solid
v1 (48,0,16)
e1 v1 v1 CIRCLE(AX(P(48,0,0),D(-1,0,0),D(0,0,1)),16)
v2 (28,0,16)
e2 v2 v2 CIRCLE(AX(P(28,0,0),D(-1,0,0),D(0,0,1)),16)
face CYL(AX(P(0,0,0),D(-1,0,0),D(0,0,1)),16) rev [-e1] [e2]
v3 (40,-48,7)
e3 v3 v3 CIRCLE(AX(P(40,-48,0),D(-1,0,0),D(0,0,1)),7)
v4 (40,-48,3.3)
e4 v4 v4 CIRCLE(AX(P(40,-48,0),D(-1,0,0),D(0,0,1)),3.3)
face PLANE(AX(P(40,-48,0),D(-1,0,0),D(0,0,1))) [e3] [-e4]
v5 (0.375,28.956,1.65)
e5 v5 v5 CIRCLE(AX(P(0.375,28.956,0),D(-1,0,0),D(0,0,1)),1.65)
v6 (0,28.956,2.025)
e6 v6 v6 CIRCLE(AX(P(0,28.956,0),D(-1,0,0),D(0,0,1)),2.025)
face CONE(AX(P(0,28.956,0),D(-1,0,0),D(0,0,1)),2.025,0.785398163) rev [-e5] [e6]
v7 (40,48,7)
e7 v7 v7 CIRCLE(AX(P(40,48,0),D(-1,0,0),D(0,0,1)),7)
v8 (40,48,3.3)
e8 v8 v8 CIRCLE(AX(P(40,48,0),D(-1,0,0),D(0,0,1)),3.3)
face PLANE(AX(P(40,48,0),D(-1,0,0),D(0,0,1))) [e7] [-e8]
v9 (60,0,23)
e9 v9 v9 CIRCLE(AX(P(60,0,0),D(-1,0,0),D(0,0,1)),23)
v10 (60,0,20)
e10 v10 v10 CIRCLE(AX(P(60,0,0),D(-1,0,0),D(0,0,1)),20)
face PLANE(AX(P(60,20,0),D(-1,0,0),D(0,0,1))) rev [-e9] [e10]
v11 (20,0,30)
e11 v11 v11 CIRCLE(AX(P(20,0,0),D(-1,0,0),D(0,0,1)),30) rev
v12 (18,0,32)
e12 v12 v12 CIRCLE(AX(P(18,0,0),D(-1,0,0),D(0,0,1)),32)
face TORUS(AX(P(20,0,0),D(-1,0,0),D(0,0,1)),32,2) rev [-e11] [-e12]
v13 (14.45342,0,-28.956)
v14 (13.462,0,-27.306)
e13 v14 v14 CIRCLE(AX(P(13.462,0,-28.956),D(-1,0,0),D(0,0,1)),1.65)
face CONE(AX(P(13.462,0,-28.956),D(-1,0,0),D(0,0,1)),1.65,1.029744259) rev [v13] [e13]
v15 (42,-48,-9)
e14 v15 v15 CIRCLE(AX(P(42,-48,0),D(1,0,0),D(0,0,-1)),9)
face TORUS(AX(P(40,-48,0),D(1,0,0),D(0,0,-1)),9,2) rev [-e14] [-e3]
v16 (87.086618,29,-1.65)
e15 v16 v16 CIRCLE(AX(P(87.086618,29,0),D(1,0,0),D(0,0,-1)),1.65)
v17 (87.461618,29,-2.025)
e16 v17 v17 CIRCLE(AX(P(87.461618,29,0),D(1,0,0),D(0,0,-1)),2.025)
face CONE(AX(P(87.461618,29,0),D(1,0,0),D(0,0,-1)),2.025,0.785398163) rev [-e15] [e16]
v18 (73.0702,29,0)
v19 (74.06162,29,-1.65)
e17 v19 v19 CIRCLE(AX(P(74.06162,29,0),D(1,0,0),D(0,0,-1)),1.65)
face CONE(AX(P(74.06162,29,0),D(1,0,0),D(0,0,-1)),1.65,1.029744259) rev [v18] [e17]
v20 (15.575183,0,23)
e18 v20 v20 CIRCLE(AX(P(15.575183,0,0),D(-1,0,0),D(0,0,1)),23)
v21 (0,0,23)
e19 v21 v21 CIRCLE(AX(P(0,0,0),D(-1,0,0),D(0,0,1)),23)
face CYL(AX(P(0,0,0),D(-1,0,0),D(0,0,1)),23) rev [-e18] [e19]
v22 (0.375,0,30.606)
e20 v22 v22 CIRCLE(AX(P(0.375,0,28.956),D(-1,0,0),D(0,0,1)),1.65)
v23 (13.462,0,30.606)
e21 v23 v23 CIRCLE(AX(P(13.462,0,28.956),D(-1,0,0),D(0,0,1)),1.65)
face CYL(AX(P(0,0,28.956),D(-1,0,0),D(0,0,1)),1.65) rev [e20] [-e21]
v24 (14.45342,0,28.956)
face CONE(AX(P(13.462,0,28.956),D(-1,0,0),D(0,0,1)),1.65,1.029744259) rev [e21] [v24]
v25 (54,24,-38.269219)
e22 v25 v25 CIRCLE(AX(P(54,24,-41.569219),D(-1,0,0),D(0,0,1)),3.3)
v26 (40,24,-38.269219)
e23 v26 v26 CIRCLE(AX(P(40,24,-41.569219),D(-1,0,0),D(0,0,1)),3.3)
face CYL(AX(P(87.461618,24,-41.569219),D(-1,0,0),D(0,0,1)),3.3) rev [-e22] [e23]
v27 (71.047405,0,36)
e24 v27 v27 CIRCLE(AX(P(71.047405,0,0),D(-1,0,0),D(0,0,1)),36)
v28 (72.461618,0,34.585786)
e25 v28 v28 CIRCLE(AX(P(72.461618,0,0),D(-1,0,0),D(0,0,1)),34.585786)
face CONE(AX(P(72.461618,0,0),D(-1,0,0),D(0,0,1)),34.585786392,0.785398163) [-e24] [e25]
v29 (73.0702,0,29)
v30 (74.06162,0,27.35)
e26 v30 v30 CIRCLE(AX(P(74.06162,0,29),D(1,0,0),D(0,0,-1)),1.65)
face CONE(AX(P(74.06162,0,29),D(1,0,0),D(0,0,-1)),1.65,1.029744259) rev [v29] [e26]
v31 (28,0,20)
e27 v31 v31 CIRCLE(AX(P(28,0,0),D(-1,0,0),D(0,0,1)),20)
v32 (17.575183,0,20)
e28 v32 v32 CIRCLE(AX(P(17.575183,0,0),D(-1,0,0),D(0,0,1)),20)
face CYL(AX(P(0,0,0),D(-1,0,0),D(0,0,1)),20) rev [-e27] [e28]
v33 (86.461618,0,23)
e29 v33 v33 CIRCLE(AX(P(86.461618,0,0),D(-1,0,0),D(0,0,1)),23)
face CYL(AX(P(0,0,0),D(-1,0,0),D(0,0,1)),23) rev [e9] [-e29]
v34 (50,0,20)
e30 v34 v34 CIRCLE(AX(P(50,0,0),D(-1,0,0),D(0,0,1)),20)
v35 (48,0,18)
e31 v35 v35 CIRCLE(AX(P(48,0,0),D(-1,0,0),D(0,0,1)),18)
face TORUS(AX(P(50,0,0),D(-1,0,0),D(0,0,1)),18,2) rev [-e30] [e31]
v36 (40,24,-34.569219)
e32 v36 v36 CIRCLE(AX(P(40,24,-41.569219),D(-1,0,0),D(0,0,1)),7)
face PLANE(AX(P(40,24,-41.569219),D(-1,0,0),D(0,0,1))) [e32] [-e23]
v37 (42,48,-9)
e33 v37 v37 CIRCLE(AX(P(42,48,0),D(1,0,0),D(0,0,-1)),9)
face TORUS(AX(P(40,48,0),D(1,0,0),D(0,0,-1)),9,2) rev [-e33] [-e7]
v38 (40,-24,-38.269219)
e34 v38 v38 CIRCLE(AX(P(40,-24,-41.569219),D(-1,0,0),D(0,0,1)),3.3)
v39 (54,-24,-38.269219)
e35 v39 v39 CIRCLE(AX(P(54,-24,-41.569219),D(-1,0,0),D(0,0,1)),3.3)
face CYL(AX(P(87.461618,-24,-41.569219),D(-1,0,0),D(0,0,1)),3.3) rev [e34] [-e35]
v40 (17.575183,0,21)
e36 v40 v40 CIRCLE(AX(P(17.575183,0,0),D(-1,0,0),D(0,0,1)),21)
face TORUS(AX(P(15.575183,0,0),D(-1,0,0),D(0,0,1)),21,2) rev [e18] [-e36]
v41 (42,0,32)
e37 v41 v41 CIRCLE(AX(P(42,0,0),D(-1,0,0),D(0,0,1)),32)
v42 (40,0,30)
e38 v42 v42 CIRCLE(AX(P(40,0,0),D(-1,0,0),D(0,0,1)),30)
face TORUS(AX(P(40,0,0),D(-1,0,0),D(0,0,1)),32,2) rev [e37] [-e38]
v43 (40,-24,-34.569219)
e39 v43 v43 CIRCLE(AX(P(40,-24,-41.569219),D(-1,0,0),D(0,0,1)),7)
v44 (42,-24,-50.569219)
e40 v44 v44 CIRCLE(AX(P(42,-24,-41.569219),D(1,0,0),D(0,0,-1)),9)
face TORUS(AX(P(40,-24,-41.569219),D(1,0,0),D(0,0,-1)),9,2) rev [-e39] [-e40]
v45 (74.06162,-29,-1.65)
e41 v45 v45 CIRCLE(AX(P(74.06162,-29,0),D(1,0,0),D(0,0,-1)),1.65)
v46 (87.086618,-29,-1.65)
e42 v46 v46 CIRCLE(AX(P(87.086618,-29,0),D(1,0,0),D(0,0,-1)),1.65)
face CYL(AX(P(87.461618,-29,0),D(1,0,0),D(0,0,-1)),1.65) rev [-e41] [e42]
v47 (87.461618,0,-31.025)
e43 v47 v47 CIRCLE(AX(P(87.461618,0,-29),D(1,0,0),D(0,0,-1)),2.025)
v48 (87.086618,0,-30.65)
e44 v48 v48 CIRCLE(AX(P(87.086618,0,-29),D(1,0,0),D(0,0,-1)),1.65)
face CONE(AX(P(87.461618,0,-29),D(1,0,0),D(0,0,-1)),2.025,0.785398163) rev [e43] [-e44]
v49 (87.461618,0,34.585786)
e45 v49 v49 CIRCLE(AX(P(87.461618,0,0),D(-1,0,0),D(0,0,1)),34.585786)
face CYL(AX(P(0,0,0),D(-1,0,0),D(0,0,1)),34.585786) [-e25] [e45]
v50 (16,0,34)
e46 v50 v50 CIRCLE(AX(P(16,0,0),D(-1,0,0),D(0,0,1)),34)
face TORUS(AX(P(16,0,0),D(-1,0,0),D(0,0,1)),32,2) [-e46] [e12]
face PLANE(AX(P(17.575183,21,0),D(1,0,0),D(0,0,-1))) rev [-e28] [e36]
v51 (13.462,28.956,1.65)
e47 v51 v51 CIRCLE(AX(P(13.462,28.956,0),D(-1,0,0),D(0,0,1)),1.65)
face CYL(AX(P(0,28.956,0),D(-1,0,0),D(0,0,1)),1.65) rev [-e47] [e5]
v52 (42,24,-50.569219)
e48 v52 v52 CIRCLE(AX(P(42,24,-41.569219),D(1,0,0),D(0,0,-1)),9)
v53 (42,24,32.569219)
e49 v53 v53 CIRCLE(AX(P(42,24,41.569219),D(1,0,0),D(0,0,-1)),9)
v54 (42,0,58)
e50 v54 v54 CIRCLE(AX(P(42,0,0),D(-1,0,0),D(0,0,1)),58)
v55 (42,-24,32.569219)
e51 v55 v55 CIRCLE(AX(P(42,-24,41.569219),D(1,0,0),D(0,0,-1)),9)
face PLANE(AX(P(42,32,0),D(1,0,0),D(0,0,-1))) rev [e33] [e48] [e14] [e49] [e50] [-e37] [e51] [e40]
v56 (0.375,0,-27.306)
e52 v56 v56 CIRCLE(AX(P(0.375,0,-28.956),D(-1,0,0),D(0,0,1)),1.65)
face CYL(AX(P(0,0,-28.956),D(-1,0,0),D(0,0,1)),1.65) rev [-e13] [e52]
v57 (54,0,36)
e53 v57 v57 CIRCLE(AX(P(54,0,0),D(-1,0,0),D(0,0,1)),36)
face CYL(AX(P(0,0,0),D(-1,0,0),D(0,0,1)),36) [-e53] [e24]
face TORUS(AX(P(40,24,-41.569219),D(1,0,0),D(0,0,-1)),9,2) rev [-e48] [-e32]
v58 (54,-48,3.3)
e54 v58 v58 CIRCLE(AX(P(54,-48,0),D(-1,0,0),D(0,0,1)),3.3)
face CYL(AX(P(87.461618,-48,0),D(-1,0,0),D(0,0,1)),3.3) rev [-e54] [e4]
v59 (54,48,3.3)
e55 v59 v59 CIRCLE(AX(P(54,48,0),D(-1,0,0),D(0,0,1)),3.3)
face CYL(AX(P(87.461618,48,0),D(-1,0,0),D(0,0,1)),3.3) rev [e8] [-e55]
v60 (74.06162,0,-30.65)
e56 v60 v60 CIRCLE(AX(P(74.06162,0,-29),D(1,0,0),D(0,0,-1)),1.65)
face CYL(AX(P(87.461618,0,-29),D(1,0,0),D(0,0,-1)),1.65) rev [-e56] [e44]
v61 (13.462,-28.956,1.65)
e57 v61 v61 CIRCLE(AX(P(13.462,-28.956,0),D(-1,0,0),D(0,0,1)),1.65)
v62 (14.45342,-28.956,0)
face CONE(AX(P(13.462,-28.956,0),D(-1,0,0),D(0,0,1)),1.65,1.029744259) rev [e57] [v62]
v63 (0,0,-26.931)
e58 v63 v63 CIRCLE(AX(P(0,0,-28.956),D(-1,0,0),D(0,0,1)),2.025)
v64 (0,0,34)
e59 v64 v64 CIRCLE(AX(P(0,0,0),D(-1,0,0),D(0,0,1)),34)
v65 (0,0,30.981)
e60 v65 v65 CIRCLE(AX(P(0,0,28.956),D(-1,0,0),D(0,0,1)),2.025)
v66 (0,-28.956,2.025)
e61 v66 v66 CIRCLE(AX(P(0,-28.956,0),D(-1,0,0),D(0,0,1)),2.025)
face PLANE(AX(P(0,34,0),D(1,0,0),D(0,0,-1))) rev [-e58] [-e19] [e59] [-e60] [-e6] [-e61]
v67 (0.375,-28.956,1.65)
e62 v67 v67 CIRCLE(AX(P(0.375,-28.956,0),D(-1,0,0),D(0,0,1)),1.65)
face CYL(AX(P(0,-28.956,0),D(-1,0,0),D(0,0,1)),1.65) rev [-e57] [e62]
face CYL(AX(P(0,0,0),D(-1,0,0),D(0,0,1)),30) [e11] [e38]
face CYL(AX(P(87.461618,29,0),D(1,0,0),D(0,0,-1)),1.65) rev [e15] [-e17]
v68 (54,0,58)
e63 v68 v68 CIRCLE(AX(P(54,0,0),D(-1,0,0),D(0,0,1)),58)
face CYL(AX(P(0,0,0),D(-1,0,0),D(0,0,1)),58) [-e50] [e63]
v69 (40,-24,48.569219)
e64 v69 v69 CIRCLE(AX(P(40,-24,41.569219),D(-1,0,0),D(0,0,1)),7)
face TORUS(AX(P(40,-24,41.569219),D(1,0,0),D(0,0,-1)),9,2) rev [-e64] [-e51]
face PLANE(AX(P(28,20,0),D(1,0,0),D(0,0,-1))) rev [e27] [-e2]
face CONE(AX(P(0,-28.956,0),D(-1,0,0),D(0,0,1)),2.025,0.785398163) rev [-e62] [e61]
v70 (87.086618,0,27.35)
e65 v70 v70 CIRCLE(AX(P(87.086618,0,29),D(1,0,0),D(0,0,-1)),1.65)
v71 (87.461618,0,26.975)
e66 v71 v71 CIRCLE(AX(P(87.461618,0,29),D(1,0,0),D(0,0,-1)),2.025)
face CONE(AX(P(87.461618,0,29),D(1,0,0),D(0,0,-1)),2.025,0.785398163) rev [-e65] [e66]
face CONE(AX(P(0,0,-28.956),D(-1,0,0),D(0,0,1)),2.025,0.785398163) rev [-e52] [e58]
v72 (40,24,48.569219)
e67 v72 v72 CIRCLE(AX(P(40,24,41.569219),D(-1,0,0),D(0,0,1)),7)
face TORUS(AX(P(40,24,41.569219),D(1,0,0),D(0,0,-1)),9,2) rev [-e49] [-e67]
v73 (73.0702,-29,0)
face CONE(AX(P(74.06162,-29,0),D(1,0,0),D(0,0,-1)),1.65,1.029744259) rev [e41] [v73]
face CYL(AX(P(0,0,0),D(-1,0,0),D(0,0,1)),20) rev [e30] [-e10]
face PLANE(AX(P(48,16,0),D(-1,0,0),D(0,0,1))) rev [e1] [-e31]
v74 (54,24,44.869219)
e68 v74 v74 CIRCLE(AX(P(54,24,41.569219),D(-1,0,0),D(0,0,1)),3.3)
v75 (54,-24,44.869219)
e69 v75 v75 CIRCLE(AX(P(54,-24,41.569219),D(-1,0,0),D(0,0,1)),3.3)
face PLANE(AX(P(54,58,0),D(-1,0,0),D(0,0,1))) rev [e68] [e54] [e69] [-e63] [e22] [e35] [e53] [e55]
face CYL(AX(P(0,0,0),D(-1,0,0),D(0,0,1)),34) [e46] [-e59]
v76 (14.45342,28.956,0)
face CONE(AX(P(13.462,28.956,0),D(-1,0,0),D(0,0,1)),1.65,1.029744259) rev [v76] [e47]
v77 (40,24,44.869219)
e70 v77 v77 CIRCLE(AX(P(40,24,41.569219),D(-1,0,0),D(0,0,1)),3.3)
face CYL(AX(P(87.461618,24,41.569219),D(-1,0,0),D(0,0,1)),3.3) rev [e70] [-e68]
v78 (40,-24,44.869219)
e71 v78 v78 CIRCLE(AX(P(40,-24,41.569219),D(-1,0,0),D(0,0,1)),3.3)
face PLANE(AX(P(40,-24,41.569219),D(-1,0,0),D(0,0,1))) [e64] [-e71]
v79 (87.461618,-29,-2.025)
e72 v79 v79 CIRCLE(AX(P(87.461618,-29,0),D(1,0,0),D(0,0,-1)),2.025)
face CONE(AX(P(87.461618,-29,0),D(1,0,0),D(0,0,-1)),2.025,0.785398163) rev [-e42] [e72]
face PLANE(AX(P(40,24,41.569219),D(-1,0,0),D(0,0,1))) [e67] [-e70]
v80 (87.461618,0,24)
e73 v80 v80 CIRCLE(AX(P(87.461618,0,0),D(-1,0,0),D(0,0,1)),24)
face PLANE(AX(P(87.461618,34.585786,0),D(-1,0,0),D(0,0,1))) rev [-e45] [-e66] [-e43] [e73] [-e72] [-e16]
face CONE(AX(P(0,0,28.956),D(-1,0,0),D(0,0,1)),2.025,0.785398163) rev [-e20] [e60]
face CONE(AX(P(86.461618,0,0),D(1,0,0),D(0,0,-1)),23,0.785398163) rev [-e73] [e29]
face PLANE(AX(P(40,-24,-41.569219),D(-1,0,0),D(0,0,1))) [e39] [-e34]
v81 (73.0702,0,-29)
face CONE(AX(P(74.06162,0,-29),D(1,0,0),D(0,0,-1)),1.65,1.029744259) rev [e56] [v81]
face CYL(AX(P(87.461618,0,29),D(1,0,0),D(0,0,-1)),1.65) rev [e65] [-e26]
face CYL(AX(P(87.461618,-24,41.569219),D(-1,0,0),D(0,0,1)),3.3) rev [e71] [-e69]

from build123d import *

# Parameters (mm, degrees)
SKETCH2_R                       = 7
BOSS_EXTRUDE1_DEPTH             = 2
FILLET1_R                       = 2.000000064
SKETCH3_R                       = 3.3
CUT_EXTRUDE1_DEPTH              = 95.766055219
M4X0_7_TAPPED_HOLE1_D           = 3.3
M4X0_7_TAPPED_HOLE1_DEPTH       = 13.3999986
M4X0_7_TAPPED_HOLE1_CSINK_D     = 4.05
M4X0_7_TAPPED_HOLE1_CSINK_ANGLE = 90
M4X0_7_TAPPED_HOLE1_TIP         = 0.991420021
M4X0_7_TAPPED_HOLE2_D           = 3.3
M4X0_7_TAPPED_HOLE2_DEPTH       = 13.462
M4X0_7_TAPPED_HOLE2_CSINK_D     = 4.05
M4X0_7_TAPPED_HOLE2_CSINK_ANGLE = 90
M4X0_7_TAPPED_HOLE2_TIP         = 0.991420021
FILLET2_R                       = 2.000000064


with BuildPart() as part:
    # Sketch1 → Revolve1 (revolve)
    with BuildSketch(Plane.XY, mode=Mode.PRIVATE) as revolve1_sk:
        with BuildLine():
            Line((0, 34), (0, 23))
            Line((0, 23), (15.575182577, 23))
            ThreePointArc((15.575182577, 23), (16.989396139, 22.414213562), (17.575182577, 21))
            Line((17.575182577, 21), (17.575182577, 20))
            Line((17.575182577, 20), (28, 20))
            Line((28, 20), (28, 16))
            Line((28, 16), (48, 16))
            Line((48, 16), (48, 18))
            ThreePointArc((48, 18), (48.585786438, 19.414213562), (50, 20))
            Line((50, 20), (60, 20))
            Line((60, 20), (60, 23))
            Line((60, 23), (86.461618407, 23))
            Line((86.461618407, 23), (87.461618407, 24))
            Line((87.461618407, 24), (87.461618407, 34.585786392))
            Line((87.461618407, 34.585786392), (72.461618407, 34.585786392))
            Line((72.461618407, 34.585786392), (71.047404799, 36))
            Line((71.047404799, 36), (54, 36))
            Line((54, 36), (54, 58))
            Line((54, 58), (42, 58))
            Line((42, 58), (42, 32))
            ThreePointArc((42, 32), (41.414213562, 30.585786438), (40, 30))
            Line((40, 30), (18, 30))
            Line((18, 30), (18, 34))
            Line((18, 34), (0, 34))
        make_face()
    revolve(revolve1_sk.sketch.rotate(Axis((0, 0, 0), (1, 0, 0)), 90), axis=Axis((0, 0, 0), (1, 0, 0)))

    # Sketch2 → Boss-Extrude1 (add)
    with BuildSketch(Plane.ZY.offset(-42)):
        with Locations(Location((0, 48, 0), (0, 0, 180))):
            Circle(SKETCH2_R)
        with Locations(Location((41.569219382, 24, 0), (0, 0, 180))):
            Circle(SKETCH2_R)
        with Locations(Location((41.569219382, -24, 0), (0, 0, 180))):
            Circle(SKETCH2_R)
        with Locations(Location((0, -48, 0), (0, 0, 180))):
            Circle(SKETCH2_R)
        with Locations(Location((-41.569219382, -24, 0), (0, 0, 180))):
            Circle(SKETCH2_R)
        with Locations(Location((-41.569219382, 24, 0), (0, 0, 180))):
            Circle(SKETCH2_R)
    extrude(amount=BOSS_EXTRUDE1_DEPTH)

    # Fillet1
    fillet1_edges = [part.edges().sort_by_distance(p)[0] for p in [
        (42, 48, 7),
        (42, 24, 48.569219382),
        (42, -24, 48.569219382),
        (42, -48, 7),
        (42, -24, -34.569219382),
        (42, 24, -34.569219382),
    ]]
    fillet(fillet1_edges, radius=FILLET1_R - 0.0001)  # a hair under: the kernel refuses the full size

    # Sketch3 → Cut-Extrude1 (cut, through all)
    with BuildSketch(Plane.ZY.offset(-40)):
        with Locations((0, 48)):
            Circle(SKETCH3_R)
        with Locations((41.569219382, 24)):
            Circle(SKETCH3_R)
        with Locations((41.569219382, -24)):
            Circle(SKETCH3_R)
        with Locations((0, -48)):
            Circle(SKETCH3_R)
        with Locations((-41.569219382, -24)):
            Circle(SKETCH3_R)
        with Locations((-41.569219382, 24)):
            Circle(SKETCH3_R)
    extrude(amount=-CUT_EXTRUDE1_DEPTH, mode=Mode.SUBTRACT)

    # M4x0.7 Tapped Hole1
    with Locations(Plane(origin=(87.461618407, 29, 0), x_dir=(0, 0, 1), z_dir=(1, 0, 0))):
        with Locations((0, 0), (-29, 29), (0, 58), (29, 29)):
            CounterSinkHole(M4X0_7_TAPPED_HOLE1_D / 2, M4X0_7_TAPPED_HOLE1_CSINK_D / 2, depth=M4X0_7_TAPPED_HOLE1_DEPTH, counter_sink_angle=M4X0_7_TAPPED_HOLE1_CSINK_ANGLE)
            with Locations((0, 0, -(M4X0_7_TAPPED_HOLE1_DEPTH + M4X0_7_TAPPED_HOLE1_TIP / 2))):  # 118° drill point
                Cone(0, M4X0_7_TAPPED_HOLE1_D / 2, M4X0_7_TAPPED_HOLE1_TIP, mode=Mode.SUBTRACT)

    # M4x0.7 Tapped Hole2
    with Locations(Plane(origin=(0, 28.956, 0), x_dir=(0, 0, -1), z_dir=(-1, 0, 0))):
        with Locations((0, 0), (-28.956, 28.956), (28.956, 28.956), (0, 57.912)):
            CounterSinkHole(M4X0_7_TAPPED_HOLE2_D / 2, M4X0_7_TAPPED_HOLE2_CSINK_D / 2, depth=M4X0_7_TAPPED_HOLE2_DEPTH, counter_sink_angle=M4X0_7_TAPPED_HOLE2_CSINK_ANGLE)
            with Locations((0, 0, -(M4X0_7_TAPPED_HOLE2_DEPTH + M4X0_7_TAPPED_HOLE2_TIP / 2))):  # 118° drill point
                Cone(0, M4X0_7_TAPPED_HOLE2_D / 2, M4X0_7_TAPPED_HOLE2_TIP, mode=Mode.SUBTRACT)

    # Fillet2
    fillet2_edges = [part.edges().sort_by_distance(p)[0] for p in [
        (18, 0, -34),
        (18, 0, -30),
    ]]
    fillet(fillet2_edges, radius=FILLET2_R - 0.0001)  # a hair under: the kernel refuses the full size


solid = part.part
